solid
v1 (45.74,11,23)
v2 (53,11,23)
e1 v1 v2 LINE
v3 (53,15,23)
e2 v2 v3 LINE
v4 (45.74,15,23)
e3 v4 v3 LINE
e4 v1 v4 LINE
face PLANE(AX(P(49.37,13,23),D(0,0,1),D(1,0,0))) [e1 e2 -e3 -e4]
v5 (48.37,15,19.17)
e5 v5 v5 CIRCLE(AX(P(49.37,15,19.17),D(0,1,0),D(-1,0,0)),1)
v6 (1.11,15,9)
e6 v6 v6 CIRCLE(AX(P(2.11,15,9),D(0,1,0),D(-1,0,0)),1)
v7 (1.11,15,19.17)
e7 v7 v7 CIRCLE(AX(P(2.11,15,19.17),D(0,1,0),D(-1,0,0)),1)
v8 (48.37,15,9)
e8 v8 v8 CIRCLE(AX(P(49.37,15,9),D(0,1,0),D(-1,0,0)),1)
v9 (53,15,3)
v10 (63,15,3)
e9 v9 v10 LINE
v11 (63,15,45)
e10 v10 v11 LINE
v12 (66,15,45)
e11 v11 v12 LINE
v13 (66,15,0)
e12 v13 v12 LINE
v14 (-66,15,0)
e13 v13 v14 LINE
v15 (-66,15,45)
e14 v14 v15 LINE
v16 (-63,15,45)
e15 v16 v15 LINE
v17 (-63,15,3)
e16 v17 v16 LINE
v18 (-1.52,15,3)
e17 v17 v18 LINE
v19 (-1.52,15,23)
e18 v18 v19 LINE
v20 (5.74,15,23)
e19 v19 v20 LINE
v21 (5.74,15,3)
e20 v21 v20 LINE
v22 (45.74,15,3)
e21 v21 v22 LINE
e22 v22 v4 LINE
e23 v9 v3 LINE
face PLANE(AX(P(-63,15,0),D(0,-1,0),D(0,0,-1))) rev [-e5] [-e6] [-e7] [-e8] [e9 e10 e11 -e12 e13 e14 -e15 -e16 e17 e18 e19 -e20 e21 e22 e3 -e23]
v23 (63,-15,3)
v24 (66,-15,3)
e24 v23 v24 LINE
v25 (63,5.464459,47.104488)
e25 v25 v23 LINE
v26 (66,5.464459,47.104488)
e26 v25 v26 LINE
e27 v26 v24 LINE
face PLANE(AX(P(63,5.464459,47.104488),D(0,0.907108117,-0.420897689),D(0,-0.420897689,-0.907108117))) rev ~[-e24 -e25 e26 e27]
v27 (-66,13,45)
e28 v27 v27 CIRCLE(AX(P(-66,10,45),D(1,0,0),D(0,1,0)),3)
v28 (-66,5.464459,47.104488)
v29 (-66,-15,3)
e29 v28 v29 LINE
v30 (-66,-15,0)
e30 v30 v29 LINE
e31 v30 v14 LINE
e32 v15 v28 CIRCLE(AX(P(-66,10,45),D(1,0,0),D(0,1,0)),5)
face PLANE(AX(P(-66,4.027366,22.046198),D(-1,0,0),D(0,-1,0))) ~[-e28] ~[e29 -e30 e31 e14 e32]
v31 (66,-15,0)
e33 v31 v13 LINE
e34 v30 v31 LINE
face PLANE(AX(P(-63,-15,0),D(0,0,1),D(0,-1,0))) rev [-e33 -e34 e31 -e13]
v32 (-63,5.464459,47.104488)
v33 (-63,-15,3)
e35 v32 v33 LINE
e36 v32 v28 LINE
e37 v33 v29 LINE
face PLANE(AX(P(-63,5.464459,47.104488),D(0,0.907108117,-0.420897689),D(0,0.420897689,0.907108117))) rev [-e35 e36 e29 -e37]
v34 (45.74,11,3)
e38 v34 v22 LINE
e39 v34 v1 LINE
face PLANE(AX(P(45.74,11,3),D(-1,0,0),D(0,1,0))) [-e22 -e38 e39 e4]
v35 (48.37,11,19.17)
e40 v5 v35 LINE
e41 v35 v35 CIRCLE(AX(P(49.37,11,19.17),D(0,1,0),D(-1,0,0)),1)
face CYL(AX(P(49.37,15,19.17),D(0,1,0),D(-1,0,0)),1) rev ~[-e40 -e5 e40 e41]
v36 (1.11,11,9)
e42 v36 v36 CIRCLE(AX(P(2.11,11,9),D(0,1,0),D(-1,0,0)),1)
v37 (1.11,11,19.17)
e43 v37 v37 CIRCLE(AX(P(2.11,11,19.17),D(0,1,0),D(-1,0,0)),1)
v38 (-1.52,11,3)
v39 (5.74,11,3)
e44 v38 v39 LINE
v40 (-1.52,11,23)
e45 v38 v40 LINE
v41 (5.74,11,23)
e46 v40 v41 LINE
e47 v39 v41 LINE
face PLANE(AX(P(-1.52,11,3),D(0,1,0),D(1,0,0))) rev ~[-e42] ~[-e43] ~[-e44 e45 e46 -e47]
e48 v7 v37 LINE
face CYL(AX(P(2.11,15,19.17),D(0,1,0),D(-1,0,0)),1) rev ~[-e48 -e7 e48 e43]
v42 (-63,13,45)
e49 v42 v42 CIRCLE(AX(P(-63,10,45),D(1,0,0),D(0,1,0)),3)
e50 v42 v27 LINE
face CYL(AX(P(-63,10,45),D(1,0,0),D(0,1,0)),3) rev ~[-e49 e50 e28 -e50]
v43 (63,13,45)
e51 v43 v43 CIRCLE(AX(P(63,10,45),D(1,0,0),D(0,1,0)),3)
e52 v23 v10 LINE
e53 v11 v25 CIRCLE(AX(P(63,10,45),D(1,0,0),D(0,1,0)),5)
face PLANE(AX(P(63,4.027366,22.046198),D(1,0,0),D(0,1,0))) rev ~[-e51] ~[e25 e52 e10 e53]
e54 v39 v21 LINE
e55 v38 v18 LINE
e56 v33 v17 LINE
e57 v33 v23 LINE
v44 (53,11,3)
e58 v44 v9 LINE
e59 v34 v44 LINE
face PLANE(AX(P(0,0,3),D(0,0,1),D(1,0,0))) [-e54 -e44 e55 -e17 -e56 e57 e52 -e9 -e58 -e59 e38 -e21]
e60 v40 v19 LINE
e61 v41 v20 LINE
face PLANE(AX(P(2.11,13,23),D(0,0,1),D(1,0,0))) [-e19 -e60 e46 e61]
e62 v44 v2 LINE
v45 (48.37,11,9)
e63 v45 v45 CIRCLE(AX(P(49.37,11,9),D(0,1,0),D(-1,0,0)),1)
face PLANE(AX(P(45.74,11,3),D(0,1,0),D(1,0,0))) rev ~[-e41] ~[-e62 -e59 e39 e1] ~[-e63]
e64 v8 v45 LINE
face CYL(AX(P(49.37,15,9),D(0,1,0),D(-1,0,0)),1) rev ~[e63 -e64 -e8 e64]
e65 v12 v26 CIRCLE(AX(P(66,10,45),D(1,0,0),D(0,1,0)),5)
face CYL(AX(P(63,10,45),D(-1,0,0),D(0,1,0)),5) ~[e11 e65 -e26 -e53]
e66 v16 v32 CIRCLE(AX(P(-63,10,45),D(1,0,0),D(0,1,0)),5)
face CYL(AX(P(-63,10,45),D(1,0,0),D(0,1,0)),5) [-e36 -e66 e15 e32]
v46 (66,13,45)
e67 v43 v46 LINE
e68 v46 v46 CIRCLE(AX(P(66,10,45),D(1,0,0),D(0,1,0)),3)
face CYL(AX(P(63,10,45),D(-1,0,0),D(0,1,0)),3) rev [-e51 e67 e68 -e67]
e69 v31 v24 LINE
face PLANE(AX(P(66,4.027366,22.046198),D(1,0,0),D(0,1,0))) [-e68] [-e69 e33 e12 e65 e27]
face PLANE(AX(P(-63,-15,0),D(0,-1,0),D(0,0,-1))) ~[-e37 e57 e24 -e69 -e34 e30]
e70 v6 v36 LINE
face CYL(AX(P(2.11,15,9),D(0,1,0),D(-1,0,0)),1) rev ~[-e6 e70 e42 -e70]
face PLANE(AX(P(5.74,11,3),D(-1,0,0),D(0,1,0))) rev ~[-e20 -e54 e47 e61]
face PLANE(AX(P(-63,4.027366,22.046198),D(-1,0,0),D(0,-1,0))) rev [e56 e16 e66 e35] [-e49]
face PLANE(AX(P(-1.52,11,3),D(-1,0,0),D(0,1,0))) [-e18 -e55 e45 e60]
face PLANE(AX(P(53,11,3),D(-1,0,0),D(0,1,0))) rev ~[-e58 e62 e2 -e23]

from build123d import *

# Parameters (mm, degrees)
F0_W     = 126
F0_H     = 30
F1_DEPTH = 3
F2_R     = 3
F2_W     = 30
F2_H     = 3
F3_DEPTH = 3
F4_W     = 7.26
F4_H     = 4
F5_DEPTH = 20
F6_R     = 1
F7_DEPTH = 4


# Not quite as in the source:
# - a pattern or mirror of a feature is missing from the dataset's text; its kind, count and spacing are read off the source's solid


with BuildPart() as f1:
    # F0 (on Top) → F1 (new body)
    with BuildSketch(Plane.XY):
        Rectangle(F0_W, F0_H)
    extrude(amount=F1_DEPTH)

    # F2 (on face) → F3 (join)
    with BuildSketch(Plane.YZ.offset(63)):
        with BuildLine():
            Line((-15, 3), (15, 3))
            Line((15, 3), (15, 45))
            ThreePointArc((15, 45), (11.0775660253, 49.8825046299), (5.4644594156, 47.1044884431))
            Line((5.4644594156, 47.1044884431), (-15, 3))
        make_face()
        with Locations((10, 45)):
            Circle(F2_R, mode=Mode.SUBTRACT)
        with Locations((0, 1.5)):
            Rectangle(F2_W, F2_H)
    f3 = extrude(amount=F3_DEPTH)

    # F3_copies: F3 across plane
    add(f3.mirror(Plane(origin=(0, 0, 0), x_dir=(0, 0, -1), z_dir=(-1, 0, 0))))

    # F4 (on face) → F5 (join)
    with BuildSketch(Plane.XY.offset(3)):
        with Locations((2.11, 13)):
            Rectangle(F4_W, F4_H)
        with Locations((49.37, 13)):
            Rectangle(F4_W, F4_H)
    extrude(amount=F5_DEPTH)

    # F6 (on face) → F7 (cut, through all)
    with BuildSketch(Plane(origin=(0, 15, 0), x_dir=(-1, 0, 0), z_dir=(0, 1, 0))):
        with Locations((-49.37, 19.17)):
            Circle(F6_R)
        with Locations((-49.37, 9)):
            Circle(F6_R)
        with Locations((-2.11, 19.17)):
            Circle(F6_R)
        with Locations((-2.11, 9)):
            Circle(F6_R)
    extrude(amount=-F7_DEPTH, mode=Mode.SUBTRACT)


solid = f1.part
